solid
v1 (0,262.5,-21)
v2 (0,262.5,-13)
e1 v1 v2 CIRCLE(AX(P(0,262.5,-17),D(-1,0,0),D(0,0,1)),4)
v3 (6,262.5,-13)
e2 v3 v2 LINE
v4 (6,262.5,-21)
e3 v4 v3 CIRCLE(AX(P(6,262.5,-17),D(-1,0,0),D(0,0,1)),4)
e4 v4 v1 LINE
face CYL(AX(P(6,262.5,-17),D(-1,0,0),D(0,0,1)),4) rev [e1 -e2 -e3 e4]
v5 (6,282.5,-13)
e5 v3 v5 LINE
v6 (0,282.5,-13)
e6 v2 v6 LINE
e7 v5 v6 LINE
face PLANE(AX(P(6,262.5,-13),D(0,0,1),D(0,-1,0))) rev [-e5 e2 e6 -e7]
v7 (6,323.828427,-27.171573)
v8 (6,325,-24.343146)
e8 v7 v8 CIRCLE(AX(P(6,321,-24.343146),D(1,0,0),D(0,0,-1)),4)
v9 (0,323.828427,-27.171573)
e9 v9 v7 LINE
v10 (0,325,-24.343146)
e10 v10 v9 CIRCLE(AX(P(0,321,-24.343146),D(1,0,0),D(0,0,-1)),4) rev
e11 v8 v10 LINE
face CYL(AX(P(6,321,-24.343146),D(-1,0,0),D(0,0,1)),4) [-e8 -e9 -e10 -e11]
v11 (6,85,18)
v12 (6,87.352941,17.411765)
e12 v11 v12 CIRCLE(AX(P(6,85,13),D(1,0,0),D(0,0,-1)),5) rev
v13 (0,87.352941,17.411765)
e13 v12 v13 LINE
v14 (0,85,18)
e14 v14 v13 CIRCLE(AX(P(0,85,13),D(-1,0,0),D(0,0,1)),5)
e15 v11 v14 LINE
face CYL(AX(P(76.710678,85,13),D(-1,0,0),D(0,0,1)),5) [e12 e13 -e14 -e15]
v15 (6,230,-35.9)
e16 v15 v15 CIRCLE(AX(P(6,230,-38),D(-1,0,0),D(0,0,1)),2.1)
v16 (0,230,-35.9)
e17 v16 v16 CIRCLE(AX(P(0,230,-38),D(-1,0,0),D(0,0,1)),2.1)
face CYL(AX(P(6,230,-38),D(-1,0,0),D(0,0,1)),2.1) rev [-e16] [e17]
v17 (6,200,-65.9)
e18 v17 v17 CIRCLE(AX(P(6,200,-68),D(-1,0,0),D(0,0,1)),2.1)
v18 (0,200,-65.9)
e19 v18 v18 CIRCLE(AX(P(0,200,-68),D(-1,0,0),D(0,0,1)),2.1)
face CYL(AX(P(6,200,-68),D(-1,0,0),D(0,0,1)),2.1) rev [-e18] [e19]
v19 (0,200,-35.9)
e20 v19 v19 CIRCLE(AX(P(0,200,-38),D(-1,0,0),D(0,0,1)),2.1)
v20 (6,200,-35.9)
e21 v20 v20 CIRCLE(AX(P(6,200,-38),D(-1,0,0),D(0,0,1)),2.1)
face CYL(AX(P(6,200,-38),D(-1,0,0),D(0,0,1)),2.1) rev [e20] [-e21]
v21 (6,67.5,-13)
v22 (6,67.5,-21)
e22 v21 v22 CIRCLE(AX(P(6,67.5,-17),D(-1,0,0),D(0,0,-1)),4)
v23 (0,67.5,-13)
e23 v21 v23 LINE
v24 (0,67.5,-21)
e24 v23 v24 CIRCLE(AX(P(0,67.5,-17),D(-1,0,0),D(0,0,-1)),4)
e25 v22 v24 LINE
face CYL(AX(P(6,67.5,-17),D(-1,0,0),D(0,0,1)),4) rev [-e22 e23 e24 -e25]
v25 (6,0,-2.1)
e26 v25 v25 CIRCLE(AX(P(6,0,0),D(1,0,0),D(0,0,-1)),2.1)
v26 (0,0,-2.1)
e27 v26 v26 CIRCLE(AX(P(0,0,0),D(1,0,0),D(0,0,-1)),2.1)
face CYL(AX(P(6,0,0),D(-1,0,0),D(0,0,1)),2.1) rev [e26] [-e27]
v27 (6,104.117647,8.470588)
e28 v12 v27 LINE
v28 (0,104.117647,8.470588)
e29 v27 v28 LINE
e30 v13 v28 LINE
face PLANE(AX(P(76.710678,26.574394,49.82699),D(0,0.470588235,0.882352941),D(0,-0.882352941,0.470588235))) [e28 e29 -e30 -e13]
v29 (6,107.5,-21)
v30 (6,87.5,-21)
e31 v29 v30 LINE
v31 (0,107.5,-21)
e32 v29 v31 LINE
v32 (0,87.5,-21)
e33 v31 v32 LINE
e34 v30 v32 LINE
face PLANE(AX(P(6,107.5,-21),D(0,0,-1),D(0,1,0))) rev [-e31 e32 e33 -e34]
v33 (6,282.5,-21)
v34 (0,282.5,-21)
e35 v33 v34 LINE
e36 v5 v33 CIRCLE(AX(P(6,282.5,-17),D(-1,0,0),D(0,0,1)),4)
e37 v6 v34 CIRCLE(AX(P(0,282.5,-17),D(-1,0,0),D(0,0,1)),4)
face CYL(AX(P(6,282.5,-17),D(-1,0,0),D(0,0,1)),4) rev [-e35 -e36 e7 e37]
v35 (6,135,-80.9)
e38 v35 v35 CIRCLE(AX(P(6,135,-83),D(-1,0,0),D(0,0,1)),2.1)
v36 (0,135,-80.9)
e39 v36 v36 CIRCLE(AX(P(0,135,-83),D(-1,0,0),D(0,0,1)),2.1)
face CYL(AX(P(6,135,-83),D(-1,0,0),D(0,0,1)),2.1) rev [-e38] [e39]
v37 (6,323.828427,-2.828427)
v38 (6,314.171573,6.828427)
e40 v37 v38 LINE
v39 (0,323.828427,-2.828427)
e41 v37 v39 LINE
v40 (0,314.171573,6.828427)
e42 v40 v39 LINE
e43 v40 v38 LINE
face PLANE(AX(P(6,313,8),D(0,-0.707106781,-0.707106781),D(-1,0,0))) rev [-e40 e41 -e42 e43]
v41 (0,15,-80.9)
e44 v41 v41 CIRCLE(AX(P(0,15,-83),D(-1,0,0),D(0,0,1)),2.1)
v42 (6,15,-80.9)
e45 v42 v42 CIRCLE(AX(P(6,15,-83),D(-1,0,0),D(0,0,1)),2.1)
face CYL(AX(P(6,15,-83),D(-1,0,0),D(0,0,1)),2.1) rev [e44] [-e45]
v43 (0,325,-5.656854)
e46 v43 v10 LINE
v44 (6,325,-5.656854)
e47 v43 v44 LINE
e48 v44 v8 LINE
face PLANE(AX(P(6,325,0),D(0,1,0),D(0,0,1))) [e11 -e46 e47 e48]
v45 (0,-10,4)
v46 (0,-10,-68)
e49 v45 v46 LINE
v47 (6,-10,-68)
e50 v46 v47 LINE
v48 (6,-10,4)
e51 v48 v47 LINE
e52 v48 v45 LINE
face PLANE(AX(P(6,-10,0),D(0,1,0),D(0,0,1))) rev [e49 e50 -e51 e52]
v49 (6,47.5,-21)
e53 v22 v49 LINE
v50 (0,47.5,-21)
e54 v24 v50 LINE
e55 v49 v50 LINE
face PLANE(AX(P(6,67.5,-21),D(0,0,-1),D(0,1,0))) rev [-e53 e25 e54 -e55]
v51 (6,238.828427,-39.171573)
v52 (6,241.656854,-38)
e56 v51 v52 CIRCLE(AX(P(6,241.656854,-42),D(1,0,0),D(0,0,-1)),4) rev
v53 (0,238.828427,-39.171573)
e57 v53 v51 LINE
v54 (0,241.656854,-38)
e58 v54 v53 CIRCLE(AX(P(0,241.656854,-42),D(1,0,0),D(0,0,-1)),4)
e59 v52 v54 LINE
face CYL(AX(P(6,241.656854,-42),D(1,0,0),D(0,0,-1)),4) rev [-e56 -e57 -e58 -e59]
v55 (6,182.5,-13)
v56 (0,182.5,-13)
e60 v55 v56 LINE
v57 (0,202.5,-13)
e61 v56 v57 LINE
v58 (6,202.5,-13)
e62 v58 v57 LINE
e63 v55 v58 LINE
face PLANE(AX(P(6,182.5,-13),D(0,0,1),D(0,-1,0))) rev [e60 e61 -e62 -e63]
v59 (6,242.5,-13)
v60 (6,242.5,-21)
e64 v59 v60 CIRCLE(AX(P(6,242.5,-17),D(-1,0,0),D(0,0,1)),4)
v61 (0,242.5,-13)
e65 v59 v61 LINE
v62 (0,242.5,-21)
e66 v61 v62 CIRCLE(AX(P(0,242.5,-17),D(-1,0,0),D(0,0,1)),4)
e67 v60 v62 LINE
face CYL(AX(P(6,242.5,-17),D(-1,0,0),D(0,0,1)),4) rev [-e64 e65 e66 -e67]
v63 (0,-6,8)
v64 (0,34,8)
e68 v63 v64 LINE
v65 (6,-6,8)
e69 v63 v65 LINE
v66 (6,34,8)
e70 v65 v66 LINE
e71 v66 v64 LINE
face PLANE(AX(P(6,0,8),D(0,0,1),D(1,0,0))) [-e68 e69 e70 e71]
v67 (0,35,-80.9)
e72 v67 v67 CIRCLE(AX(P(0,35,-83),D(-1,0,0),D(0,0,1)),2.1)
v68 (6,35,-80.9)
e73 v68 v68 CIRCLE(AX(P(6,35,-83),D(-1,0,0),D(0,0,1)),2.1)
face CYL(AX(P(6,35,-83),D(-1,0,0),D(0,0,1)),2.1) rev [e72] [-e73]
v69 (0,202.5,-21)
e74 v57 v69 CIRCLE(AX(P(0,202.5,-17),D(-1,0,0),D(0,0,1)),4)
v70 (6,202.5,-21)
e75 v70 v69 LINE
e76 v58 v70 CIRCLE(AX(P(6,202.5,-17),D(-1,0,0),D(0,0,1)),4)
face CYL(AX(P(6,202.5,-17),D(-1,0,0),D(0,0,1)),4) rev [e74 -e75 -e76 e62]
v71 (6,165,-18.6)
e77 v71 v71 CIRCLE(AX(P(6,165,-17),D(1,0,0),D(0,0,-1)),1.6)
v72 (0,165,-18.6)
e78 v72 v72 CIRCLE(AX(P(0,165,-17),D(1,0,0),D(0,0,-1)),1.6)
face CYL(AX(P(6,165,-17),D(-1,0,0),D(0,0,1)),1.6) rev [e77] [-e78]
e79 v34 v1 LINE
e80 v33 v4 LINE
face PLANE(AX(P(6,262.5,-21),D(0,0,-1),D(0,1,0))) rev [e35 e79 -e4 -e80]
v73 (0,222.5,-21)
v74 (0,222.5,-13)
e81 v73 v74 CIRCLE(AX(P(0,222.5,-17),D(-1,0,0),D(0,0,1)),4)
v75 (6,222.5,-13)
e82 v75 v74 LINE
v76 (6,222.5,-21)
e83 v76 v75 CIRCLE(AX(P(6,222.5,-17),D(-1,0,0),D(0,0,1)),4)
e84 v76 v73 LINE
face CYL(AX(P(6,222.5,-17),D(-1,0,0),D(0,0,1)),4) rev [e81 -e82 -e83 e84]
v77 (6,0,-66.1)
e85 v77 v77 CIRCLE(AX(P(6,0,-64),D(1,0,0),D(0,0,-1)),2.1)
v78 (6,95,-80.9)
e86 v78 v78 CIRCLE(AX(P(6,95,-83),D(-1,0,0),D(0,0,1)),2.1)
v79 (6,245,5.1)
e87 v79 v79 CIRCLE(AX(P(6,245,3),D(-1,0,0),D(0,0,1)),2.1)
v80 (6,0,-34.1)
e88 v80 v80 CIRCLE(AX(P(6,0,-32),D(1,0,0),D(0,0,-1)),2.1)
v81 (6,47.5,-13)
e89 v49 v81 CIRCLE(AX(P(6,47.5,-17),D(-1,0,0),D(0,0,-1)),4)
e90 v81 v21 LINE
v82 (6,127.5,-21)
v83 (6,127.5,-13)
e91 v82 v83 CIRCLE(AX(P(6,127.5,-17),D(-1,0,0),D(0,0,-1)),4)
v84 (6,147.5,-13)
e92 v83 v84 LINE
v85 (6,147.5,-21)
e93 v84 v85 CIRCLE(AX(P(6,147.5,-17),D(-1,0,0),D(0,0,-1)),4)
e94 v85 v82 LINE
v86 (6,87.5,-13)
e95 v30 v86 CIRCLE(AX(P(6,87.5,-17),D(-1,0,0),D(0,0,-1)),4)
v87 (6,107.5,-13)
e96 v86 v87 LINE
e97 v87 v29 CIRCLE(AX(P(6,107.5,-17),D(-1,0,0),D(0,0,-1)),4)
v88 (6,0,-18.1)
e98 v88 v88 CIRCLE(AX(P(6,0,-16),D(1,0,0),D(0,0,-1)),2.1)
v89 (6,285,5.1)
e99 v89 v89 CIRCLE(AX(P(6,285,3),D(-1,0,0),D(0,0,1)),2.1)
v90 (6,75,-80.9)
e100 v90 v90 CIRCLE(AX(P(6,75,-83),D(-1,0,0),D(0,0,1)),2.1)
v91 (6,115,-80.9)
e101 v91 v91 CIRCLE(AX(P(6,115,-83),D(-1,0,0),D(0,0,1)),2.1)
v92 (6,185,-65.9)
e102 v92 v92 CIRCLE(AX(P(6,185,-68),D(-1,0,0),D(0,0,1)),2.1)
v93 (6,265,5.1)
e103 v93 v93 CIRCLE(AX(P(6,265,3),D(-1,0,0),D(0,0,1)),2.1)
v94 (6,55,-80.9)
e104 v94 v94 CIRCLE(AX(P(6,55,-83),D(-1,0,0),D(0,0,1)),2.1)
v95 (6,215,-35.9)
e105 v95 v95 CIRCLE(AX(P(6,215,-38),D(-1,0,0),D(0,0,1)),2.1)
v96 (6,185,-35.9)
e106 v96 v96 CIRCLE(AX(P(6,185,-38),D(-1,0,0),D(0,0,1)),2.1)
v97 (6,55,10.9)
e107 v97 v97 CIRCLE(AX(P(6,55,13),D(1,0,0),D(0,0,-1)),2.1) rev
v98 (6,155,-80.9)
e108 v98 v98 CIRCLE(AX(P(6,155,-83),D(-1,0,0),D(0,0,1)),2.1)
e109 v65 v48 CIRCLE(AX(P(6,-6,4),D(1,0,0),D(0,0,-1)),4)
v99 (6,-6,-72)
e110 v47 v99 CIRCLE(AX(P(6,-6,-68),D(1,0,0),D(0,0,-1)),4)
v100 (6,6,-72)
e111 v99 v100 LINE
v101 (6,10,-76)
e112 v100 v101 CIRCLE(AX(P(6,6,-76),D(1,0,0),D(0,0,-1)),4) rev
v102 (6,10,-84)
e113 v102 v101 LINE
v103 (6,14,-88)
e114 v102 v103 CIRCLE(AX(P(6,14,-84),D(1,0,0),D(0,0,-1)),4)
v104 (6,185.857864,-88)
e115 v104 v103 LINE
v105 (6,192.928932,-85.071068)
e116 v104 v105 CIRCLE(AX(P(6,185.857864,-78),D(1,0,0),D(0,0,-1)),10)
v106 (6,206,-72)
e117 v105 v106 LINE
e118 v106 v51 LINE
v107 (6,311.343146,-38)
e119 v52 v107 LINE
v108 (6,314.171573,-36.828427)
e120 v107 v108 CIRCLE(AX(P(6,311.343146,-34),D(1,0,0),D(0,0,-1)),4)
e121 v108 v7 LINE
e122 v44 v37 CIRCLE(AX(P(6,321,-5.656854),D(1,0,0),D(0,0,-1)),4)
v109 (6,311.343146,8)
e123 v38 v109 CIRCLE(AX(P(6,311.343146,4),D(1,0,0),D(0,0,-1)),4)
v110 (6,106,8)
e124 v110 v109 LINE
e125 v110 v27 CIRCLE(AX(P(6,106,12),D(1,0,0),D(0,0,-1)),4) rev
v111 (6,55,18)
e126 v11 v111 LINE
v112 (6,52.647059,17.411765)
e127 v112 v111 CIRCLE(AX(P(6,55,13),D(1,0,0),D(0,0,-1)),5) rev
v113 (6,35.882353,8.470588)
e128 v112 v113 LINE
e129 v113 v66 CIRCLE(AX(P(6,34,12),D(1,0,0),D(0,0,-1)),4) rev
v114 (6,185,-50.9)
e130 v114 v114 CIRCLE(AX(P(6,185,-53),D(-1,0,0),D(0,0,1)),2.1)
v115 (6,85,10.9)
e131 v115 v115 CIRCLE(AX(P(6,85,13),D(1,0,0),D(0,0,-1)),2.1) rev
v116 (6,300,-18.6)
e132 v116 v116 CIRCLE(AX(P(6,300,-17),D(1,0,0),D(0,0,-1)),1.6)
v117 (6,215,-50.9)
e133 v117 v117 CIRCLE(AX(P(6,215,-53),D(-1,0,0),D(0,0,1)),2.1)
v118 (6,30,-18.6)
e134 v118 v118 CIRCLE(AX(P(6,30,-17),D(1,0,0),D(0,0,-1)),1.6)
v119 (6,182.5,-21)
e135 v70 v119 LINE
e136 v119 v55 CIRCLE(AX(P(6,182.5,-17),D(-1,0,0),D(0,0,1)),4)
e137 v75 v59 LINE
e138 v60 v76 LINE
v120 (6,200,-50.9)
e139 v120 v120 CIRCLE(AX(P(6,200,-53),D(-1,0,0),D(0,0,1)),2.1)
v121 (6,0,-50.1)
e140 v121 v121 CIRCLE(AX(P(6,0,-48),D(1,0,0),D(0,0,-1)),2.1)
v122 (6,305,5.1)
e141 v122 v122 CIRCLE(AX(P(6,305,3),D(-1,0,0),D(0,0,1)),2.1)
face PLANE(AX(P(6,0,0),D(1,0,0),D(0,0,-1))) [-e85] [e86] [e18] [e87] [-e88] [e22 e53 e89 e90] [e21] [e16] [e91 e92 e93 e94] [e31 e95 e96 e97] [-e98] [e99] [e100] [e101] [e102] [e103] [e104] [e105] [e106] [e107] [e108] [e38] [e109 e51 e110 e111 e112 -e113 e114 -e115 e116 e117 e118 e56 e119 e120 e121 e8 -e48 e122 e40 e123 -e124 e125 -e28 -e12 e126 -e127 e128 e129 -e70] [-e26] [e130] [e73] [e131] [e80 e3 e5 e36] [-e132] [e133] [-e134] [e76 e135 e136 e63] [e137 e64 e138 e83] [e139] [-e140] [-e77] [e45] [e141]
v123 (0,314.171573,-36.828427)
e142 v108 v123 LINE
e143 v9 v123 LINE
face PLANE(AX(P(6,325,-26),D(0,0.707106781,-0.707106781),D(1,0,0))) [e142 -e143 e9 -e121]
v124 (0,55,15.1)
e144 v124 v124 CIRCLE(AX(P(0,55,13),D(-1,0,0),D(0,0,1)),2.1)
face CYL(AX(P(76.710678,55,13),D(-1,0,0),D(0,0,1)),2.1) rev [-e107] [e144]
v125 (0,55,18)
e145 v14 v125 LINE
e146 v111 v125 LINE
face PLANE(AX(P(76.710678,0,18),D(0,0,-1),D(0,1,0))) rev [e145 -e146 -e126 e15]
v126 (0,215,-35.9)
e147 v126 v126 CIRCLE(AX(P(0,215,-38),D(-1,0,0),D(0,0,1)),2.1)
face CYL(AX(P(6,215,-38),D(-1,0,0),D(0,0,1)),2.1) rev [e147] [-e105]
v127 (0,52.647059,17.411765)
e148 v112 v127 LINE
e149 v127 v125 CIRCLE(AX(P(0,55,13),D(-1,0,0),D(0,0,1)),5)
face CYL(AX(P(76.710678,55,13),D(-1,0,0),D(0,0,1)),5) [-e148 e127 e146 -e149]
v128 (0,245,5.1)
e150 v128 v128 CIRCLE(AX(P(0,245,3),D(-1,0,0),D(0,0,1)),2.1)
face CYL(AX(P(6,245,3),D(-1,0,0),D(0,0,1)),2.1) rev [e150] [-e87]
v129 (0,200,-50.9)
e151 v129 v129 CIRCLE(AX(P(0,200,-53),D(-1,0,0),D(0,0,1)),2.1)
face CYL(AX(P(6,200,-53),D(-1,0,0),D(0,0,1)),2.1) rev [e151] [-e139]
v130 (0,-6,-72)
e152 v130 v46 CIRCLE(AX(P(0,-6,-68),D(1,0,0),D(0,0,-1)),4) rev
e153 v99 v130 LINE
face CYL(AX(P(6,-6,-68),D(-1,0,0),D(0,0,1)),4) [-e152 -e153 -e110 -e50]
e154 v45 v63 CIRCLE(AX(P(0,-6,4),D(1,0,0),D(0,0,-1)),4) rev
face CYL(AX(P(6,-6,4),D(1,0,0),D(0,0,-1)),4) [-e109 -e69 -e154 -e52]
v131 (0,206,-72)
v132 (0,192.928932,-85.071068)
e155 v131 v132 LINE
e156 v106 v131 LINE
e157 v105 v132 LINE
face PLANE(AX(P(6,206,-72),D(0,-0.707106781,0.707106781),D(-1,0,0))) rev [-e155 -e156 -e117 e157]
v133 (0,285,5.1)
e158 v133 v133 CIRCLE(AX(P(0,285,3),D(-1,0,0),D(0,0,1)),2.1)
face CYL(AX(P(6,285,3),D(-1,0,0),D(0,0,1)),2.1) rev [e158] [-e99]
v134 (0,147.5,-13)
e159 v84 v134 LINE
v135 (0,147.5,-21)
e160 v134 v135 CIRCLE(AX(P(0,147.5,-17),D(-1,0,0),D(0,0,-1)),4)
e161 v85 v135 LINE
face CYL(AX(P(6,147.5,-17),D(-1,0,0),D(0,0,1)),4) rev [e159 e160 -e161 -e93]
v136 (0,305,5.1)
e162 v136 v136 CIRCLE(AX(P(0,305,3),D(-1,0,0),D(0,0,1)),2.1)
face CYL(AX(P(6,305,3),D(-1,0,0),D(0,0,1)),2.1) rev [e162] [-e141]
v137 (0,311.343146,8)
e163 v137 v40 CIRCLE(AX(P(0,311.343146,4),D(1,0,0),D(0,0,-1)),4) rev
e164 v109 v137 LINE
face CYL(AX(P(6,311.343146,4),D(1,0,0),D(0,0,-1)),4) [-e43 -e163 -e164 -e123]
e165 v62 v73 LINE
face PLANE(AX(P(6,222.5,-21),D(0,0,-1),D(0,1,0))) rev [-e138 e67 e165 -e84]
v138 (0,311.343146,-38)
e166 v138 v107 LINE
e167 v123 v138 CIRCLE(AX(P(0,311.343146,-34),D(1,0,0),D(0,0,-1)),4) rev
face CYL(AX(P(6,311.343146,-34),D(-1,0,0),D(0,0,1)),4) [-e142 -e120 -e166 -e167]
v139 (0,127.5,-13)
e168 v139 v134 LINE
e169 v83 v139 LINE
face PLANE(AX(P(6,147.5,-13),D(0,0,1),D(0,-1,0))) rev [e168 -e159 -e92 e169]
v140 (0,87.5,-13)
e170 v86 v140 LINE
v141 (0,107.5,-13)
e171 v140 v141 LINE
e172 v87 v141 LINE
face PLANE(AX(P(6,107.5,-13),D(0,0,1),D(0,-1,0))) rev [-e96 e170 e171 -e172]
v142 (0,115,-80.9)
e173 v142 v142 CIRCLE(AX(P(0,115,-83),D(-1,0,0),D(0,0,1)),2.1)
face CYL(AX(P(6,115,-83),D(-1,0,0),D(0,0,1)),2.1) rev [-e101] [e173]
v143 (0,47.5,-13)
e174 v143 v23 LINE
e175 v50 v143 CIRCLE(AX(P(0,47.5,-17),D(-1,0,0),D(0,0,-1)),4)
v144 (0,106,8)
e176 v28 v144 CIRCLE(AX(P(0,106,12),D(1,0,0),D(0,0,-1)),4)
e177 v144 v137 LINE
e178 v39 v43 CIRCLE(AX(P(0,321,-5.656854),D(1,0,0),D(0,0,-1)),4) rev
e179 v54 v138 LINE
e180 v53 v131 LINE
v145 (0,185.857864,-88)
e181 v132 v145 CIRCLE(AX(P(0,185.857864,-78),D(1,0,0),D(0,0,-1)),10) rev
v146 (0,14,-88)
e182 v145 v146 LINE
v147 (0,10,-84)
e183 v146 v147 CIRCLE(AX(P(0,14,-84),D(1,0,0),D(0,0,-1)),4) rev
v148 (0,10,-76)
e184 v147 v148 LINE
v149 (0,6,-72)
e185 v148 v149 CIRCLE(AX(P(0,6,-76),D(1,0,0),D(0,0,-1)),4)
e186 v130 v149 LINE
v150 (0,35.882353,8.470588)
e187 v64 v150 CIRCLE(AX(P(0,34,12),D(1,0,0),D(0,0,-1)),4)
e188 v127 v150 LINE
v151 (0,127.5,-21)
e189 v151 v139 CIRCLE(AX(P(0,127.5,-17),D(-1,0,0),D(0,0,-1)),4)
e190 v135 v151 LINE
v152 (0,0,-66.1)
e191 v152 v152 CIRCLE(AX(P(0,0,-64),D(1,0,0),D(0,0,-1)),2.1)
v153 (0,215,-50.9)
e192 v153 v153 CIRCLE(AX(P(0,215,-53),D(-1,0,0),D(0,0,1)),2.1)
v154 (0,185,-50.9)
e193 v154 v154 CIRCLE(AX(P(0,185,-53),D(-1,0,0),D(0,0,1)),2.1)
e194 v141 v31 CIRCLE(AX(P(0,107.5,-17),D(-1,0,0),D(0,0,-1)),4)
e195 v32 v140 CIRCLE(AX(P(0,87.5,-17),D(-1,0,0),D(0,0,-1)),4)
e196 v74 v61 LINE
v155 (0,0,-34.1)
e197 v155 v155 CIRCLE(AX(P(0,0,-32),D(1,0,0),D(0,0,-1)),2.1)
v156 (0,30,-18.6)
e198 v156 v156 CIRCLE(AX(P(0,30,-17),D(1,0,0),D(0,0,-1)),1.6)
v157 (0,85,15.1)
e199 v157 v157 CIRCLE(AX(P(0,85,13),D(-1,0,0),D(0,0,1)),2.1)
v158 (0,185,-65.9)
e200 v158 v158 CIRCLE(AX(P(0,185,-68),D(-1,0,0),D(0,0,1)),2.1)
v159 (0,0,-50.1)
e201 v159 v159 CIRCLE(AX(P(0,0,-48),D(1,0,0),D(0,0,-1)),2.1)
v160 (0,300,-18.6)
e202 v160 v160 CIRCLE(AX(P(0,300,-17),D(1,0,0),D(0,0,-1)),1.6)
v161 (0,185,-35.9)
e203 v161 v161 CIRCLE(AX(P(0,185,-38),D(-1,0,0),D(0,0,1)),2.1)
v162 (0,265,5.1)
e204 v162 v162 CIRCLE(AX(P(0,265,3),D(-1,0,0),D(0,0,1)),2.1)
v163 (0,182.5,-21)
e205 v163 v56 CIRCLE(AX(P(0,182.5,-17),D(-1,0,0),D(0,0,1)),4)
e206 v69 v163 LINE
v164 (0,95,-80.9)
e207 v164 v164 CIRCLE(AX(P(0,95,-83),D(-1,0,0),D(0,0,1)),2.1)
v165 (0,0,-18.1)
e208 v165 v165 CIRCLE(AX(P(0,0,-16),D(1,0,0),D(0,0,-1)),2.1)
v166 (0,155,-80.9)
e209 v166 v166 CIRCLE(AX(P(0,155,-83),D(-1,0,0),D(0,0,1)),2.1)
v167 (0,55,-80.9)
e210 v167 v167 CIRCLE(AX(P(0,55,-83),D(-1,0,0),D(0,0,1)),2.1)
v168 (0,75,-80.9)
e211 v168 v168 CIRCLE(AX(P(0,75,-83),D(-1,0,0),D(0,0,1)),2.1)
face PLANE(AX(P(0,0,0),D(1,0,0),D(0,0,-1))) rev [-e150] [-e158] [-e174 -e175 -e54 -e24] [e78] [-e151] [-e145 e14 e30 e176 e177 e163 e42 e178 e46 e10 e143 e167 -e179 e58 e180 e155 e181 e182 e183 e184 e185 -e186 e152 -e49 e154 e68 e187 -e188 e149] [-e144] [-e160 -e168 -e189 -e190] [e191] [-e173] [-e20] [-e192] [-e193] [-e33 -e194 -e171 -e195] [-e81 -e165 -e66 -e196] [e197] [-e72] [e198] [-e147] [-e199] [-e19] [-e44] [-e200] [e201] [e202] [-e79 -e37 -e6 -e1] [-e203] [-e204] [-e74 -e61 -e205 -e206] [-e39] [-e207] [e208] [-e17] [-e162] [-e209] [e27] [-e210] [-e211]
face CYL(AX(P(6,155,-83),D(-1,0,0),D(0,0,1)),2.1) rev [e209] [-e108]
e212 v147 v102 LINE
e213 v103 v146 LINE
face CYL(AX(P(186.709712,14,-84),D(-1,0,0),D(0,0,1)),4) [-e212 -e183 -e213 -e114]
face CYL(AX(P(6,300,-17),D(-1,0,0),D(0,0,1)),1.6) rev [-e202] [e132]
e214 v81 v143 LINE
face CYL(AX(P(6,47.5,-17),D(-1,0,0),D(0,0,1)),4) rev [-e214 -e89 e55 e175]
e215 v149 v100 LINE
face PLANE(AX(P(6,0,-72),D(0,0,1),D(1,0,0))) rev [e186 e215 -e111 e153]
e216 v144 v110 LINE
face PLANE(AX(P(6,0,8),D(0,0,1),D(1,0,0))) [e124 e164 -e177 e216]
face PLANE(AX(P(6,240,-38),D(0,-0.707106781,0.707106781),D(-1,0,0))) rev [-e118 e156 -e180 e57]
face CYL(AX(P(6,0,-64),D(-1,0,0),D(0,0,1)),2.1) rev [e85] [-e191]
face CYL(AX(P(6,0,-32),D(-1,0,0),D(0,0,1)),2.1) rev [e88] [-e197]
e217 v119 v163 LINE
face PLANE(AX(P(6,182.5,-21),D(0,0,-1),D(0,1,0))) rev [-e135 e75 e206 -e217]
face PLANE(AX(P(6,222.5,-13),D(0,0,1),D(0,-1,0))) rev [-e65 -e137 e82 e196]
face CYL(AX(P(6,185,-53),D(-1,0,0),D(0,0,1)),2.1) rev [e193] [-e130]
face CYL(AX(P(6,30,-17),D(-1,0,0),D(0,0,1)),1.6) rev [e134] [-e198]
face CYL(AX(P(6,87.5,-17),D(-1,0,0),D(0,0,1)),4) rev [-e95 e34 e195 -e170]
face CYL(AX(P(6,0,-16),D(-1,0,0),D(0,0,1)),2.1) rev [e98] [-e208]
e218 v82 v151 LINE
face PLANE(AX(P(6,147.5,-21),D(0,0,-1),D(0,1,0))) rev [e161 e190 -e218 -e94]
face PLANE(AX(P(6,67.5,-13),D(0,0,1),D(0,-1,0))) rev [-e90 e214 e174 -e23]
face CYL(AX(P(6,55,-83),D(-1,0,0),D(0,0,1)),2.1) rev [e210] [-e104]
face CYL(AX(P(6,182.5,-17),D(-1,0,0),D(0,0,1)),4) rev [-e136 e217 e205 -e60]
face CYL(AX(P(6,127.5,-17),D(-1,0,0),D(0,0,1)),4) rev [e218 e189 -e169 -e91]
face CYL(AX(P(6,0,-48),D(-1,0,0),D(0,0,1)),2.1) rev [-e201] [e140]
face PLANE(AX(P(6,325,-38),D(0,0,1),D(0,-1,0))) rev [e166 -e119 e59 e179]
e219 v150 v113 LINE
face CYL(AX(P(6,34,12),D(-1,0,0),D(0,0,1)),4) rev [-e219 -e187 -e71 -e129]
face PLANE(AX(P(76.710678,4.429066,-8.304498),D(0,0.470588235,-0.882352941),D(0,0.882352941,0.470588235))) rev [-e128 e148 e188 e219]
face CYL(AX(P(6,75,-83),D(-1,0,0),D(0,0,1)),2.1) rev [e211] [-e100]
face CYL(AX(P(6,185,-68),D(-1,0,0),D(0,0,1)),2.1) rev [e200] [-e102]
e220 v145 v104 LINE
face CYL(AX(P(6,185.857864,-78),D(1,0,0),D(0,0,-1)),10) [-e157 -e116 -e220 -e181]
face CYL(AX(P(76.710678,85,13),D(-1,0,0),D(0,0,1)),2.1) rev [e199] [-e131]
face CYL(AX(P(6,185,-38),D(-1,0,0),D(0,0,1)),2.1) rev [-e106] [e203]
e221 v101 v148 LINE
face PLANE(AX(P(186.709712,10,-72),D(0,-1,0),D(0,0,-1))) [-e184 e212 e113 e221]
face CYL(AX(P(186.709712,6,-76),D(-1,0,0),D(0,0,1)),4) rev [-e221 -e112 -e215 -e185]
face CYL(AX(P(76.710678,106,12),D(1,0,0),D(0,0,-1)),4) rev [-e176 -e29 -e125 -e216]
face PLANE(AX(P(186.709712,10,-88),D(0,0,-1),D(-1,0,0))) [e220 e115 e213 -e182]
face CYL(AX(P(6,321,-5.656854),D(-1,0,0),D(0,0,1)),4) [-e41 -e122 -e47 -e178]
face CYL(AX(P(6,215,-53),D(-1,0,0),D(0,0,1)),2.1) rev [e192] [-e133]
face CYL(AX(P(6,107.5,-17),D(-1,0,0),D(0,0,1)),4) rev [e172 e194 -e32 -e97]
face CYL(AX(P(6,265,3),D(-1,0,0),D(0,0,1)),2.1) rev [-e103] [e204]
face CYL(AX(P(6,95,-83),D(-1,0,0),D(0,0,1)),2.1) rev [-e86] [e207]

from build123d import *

# Parameters (mm, degrees)
SKETCH_1_W          = 80
SKETCH_1_H          = 315
SKETCH_1_R          = 1.6
SKETCH_1_H_2        = 20
SKETCH_1_R_2        = 2.1
EXTRUDE_1_DEPTH     = 6
SKETCH_2_W          = 16
SKETCH_2_H          = 180
EXTRUDE_2_DEPTH     = 6
SKETCH_3_W          = 34
SKETCH_3_H          = 85
CUT_EXTRUDE_1_DEPTH = 337.756588651
CHAMFER_1_SIZE      = 16
CHAMFER_2_SIZE      = 34
SKETCH_5_R          = 2.1
CUT_EXTRUDE_2_DEPTH = 337.756588651
SKETCH_5_3_R        = 2.1
EXTRUDE_3_DEPTH     = 6
SKETCH_6_R          = 2.1
CUT_EXTRUDE_3_DEPTH = 337.756588651
FILLET_START        = -1
FILLET_1_DEPTH      = 8
CHAMFER_3_SIZE      = 12
FILLET_2_DEPTH      = 8
FILLET_2_2_DEPTH    = 6
SKETCH_7_R          = 2.1
CUT_EXTRUDE_4_DEPTH = 337.756588651
CUT_EXTRUDE_5_DEPTH = 337.756588651


with BuildPart() as part:
    # 草图1 → 凸台-拉伸1 (new body)
    # profile 1 of 2: a face of its own
    with BuildSketch(Plane(origin=(0, 0, 0), x_dir=(0, 0, -1), z_dir=(1, 0, 0))):
        with Locations((32, 167.5)):
            Rectangle(SKETCH_1_W, SKETCH_1_H)
        with Locations((17, 300)):
            Circle(SKETCH_1_R, mode=Mode.SUBTRACT)
        with Locations((17, 165)):
            Circle(SKETCH_1_R, mode=Mode.SUBTRACT)
        with Locations((17, 30)):
            Circle(SKETCH_1_R, mode=Mode.SUBTRACT)
    # profile 2 of 2: a face of its own
    with BuildSketch(Plane(origin=(0, 0, 0), x_dir=(0, 0, -1), z_dir=(1, 0, 0))):
        with Locations((32, 0)):
            Rectangle(SKETCH_1_W, SKETCH_1_H_2)
        with Locations((64, 0)):
            Circle(SKETCH_1_R_2, mode=Mode.SUBTRACT)
        with Locations((48, 0)):
            Circle(SKETCH_1_R_2, mode=Mode.SUBTRACT)
        with Locations((32, 0)):
            Circle(SKETCH_1_R_2, mode=Mode.SUBTRACT)
        with Locations((16, 0)):
            Circle(SKETCH_1_R_2, mode=Mode.SUBTRACT)
        Circle(SKETCH_1_R_2, mode=Mode.SUBTRACT)
    extrude(amount=EXTRUDE_1_DEPTH)

    # 草图2 → 凸台-拉伸2 (add)
    with BuildSketch(Plane.ZY):
        with Locations((-80, 100)):
            Rectangle(SKETCH_2_W, SKETCH_2_H)
    extrude(amount=-EXTRUDE_2_DEPTH)

    # 草图3 → 切除-拉伸1 (cut, through all)
    with BuildSketch(Plane.ZY):
        with Locations((-55, 282.5)):
            Rectangle(SKETCH_3_W, SKETCH_3_H)
    extrude(amount=-CUT_EXTRUDE_1_DEPTH, mode=Mode.SUBTRACT)

    # 倒角1
    chamfer_1_edges = [part.edges().sort_by_distance(p)[0] for p in [
        (3, 190, -72),
    ]]
    chamfer(chamfer_1_edges, length=CHAMFER_1_SIZE - 0.0001)  # a hair under: the kernel refuses the full size

    # 倒角2
    chamfer_2_edges = [part.edges().sort_by_distance(p)[0] for p in [
        (3, 240, -72),
    ]]
    chamfer(chamfer_2_edges, length=CHAMFER_2_SIZE - 0.0001)  # a hair under: the kernel refuses the full size

    # 草图5 → 切除-拉伸2 (cut, through all)
    with BuildSketch(Plane.ZY):
        with Locations((-83, 15)):
            Circle(SKETCH_5_R)
        with Locations((-83, 35)):
            Circle(SKETCH_5_R)
        with Locations((-83, 55)):
            Circle(SKETCH_5_R)
        with Locations((-83, 75)):
            Circle(SKETCH_5_R)
        with Locations((-83, 95)):
            Circle(SKETCH_5_R)
        with Locations((-83, 115)):
            Circle(SKETCH_5_R)
        with Locations((-83, 135)):
            Circle(SKETCH_5_R)
        with Locations((-83, 155)):
            Circle(SKETCH_5_R)
    extrude(amount=-CUT_EXTRUDE_2_DEPTH, mode=Mode.SUBTRACT)

    # 草图5<3> → 凸台-拉伸3 (add)
    with BuildSketch(Plane.ZY):
        with BuildLine():
            ThreePointArc((17.411764706, 52.647058824), (17.850712501, 53.787321875), (18, 55))
            Line((18, 55), (18, 85))
            ThreePointArc((18, 85), (17.850712501, 86.212678125), (17.411764706, 87.352941176))
            Line((17.411764706, 87.352941176), (8, 105))
            Line((8, 105), (8, 35))
            Line((8, 35), (17.411764706, 52.647058824))
        make_face()
        with Locations((13, 85)):
            Circle(SKETCH_5_3_R, mode=Mode.SUBTRACT)
        with Locations((13, 55)):
            Circle(SKETCH_5_3_R, mode=Mode.SUBTRACT)
    extrude(amount=-EXTRUDE_3_DEPTH)

    # 草图6 → 切除-拉伸3 (cut, through all)
    with BuildSketch(Plane.ZY):
        with Locations((-68, 185)):
            Circle(SKETCH_6_R)
        with Locations((-53, 185)):
            Circle(SKETCH_6_R)
        with Locations((-38, 185)):
            Circle(SKETCH_6_R)
        with Locations((-68, 200)):
            Circle(SKETCH_6_R)
        with Locations((-53, 200)):
            Circle(SKETCH_6_R)
        with Locations((-38, 200)):
            Circle(SKETCH_6_R)
        with Locations((-68, 215)):
            Circle(SKETCH_6_R)
        with Locations((-53, 215)):
            Circle(SKETCH_6_R)
        with Locations((-38, 215)):
            Circle(SKETCH_6_R)
        with Locations((-68, 230)):
            Circle(SKETCH_6_R)
        with Locations((-53, 230)):
            Circle(SKETCH_6_R)
        with Locations((-38, 230)):
            Circle(SKETCH_6_R)
        with Locations((-83, 200)):
            Circle(SKETCH_6_R)
        with Locations((-83, 215)):
            Circle(SKETCH_6_R)
        with Locations((-83, 230)):
            Circle(SKETCH_6_R)
    extrude(amount=-CUT_EXTRUDE_3_DEPTH, mode=Mode.SUBTRACT)

    # 圆角1: read off the stored shape, not the designer's step
    # 圆角1 outline → 圆角1 (cut)
    with BuildSketch(Plane.YZ.offset(FILLET_START)):
        with BuildLine():
            ThreePointArc((192.928932188, -85.071067812), (189.6846987, -87.238795325), (185.857864376, -88))
            Line((185.857864376, -88), (190, -88))
            Line((190, -88), (192.928932188, -85.071067812))
        make_face()
    extrude(amount=FILLET_1_DEPTH, mode=Mode.SUBTRACT)

    # 倒角3
    chamfer_3_edges = [part.edges().sort_by_distance(p)[0] for p in [
        (3, 325, 8),
        (3, 325, -38),
    ]]
    chamfer(chamfer_3_edges, length=CHAMFER_3_SIZE)

    # 圆角2: read off the stored shape, not the designer's step
    # 圆角2 outline → 圆角2 (cut)
    with BuildSketch(Plane.YZ.offset(FILLET_START)):
        with BuildLine():
            Line((313, -38), (314.171572875, -36.828427125))
            ThreePointArc((314.171572875, -36.828427125), (312.87387948, -37.69551813), (311.343145751, -38))
            Line((311.343145751, -38), (313, -38))
        make_face()
        with BuildLine():
            ThreePointArc((311.343145751, 8), (312.87387948, 7.69551813), (314.171572875, 6.828427125))
            Line((314.171572875, 6.828427125), (313, 8))
            Line((313, 8), (311.343145751, 8))
        make_face()
        with BuildLine():
            ThreePointArc((323.828427125, -2.828427125), (324.69551813, -4.12612052), (325, -5.656854249))
            Line((325, -5.656854249), (325, -4))
            Line((325, -4), (323.828427125, -2.828427125))
        make_face()
        with BuildLine():
            ThreePointArc((325, -24.343145751), (324.69551813, -25.87387948), (323.828427125, -27.171572875))
            Line((323.828427125, -27.171572875), (325, -26))
            Line((325, -26), (325, -24.343145751))
        make_face()
        with BuildLine():
            Line((10, -88), (14, -88))
            ThreePointArc((14, -88), (11.171572875, -86.828427125), (10, -84))
            Line((10, -84), (10, -88))
        make_face()
        with BuildLine():
            Line((-10, 8), (-10, 4))
            ThreePointArc((-10, 4), (-8.828427125, 6.828427125), (-6, 8))
            Line((-6, 8), (-10, 8))
        make_face()
        with BuildLine():
            Line((-10, -72), (-6, -72))
            ThreePointArc((-6, -72), (-8.828427125, -70.828427125), (-10, -68))
            Line((-10, -68), (-10, -72))
        make_face()
    extrude(amount=FILLET_2_DEPTH, mode=Mode.SUBTRACT)

    # Fillet 2 2 outline → Fillet 2 2 (add)
    with BuildSketch(Plane.YZ):
        with BuildLine():
            ThreePointArc((238.828427125, -39.171572875), (240.12612052, -38.30448187), (241.656854249, -38))
            Line((241.656854249, -38), (240, -38))
            Line((240, -38), (238.828427125, -39.171572875))
        make_face()
        with BuildLine():
            Line((105, 8), (106, 8))
            ThreePointArc((106, 8), (105.0298575, 8.119429999), (104.117647059, 8.470588235))
            Line((104.117647059, 8.470588235), (105, 8))
        make_face()
        with BuildLine():
            ThreePointArc((35.882352941, 8.470588235), (34.9701425, 8.119429999), (34, 8))
            Line((34, 8), (35, 8))
            Line((35, 8), (35.882352941, 8.470588235))
        make_face()
        with BuildLine():
            ThreePointArc((6, -72), (8.828427125, -73.171572875), (10, -76))
            Line((10, -76), (10, -72))
            Line((10, -72), (6, -72))
        make_face()
    extrude(amount=FILLET_2_2_DEPTH)

    # 草图7 → 切除-拉伸4 (cut, through all)
    with BuildSketch(Plane.ZY):
        with Locations((3, 305)):
            Circle(SKETCH_7_R)
        with Locations((3, 285)):
            Circle(SKETCH_7_R)
        with Locations((3, 265)):
            Circle(SKETCH_7_R)
        with Locations((3, 245)):
            Circle(SKETCH_7_R)
    extrude(amount=-CUT_EXTRUDE_4_DEPTH, mode=Mode.SUBTRACT)

    # 草图8 → 切除-拉伸5 (cut, through all)
    with BuildSketch(Plane.ZY):
        with BuildLine():
            Line((-21, 222.5), (-21, 242.5))
            ThreePointArc((-21, 242.5), (-17, 246.5), (-13, 242.5))
            Line((-13, 242.5), (-13, 222.5))
            ThreePointArc((-13, 222.5), (-17, 218.5), (-21, 222.5))
        make_face()
        with BuildLine():
            Line((-21, 262.5), (-21, 282.5))
            ThreePointArc((-21, 282.5), (-17, 286.5), (-13, 282.5))
            Line((-13, 282.5), (-13, 262.5))
            ThreePointArc((-13, 262.5), (-17, 258.5), (-21, 262.5))
        make_face()
        with BuildLine():
            Line((-13, 182.5), (-13, 202.5))
            ThreePointArc((-13, 202.5), (-17, 206.5), (-21, 202.5))
            Line((-21, 202.5), (-21, 182.5))
            ThreePointArc((-21, 182.5), (-17, 178.5), (-13, 182.5))
        make_face()
        with BuildLine():
            Line((-21, 147.5), (-21, 127.5))
            ThreePointArc((-21, 127.5), (-17, 123.5), (-13, 127.5))
            Line((-13, 127.5), (-13, 147.5))
            ThreePointArc((-13, 147.5), (-17, 151.5), (-21, 147.5))
        make_face()
        with BuildLine():
            Line((-21, 107.5), (-21, 87.5))
            ThreePointArc((-21, 87.5), (-17, 83.5), (-13, 87.5))
            Line((-13, 87.5), (-13, 107.5))
            ThreePointArc((-13, 107.5), (-17, 111.5), (-21, 107.5))
        make_face()
        with BuildLine():
            Line((-21, 67.5), (-21, 47.5))
            ThreePointArc((-21, 47.5), (-17, 43.5), (-13, 47.5))
            Line((-13, 47.5), (-13, 67.5))
            ThreePointArc((-13, 67.5), (-17, 71.5), (-21, 67.5))
        make_face()
    extrude(amount=-CUT_EXTRUDE_5_DEPTH, mode=Mode.SUBTRACT)


solid = part.part
